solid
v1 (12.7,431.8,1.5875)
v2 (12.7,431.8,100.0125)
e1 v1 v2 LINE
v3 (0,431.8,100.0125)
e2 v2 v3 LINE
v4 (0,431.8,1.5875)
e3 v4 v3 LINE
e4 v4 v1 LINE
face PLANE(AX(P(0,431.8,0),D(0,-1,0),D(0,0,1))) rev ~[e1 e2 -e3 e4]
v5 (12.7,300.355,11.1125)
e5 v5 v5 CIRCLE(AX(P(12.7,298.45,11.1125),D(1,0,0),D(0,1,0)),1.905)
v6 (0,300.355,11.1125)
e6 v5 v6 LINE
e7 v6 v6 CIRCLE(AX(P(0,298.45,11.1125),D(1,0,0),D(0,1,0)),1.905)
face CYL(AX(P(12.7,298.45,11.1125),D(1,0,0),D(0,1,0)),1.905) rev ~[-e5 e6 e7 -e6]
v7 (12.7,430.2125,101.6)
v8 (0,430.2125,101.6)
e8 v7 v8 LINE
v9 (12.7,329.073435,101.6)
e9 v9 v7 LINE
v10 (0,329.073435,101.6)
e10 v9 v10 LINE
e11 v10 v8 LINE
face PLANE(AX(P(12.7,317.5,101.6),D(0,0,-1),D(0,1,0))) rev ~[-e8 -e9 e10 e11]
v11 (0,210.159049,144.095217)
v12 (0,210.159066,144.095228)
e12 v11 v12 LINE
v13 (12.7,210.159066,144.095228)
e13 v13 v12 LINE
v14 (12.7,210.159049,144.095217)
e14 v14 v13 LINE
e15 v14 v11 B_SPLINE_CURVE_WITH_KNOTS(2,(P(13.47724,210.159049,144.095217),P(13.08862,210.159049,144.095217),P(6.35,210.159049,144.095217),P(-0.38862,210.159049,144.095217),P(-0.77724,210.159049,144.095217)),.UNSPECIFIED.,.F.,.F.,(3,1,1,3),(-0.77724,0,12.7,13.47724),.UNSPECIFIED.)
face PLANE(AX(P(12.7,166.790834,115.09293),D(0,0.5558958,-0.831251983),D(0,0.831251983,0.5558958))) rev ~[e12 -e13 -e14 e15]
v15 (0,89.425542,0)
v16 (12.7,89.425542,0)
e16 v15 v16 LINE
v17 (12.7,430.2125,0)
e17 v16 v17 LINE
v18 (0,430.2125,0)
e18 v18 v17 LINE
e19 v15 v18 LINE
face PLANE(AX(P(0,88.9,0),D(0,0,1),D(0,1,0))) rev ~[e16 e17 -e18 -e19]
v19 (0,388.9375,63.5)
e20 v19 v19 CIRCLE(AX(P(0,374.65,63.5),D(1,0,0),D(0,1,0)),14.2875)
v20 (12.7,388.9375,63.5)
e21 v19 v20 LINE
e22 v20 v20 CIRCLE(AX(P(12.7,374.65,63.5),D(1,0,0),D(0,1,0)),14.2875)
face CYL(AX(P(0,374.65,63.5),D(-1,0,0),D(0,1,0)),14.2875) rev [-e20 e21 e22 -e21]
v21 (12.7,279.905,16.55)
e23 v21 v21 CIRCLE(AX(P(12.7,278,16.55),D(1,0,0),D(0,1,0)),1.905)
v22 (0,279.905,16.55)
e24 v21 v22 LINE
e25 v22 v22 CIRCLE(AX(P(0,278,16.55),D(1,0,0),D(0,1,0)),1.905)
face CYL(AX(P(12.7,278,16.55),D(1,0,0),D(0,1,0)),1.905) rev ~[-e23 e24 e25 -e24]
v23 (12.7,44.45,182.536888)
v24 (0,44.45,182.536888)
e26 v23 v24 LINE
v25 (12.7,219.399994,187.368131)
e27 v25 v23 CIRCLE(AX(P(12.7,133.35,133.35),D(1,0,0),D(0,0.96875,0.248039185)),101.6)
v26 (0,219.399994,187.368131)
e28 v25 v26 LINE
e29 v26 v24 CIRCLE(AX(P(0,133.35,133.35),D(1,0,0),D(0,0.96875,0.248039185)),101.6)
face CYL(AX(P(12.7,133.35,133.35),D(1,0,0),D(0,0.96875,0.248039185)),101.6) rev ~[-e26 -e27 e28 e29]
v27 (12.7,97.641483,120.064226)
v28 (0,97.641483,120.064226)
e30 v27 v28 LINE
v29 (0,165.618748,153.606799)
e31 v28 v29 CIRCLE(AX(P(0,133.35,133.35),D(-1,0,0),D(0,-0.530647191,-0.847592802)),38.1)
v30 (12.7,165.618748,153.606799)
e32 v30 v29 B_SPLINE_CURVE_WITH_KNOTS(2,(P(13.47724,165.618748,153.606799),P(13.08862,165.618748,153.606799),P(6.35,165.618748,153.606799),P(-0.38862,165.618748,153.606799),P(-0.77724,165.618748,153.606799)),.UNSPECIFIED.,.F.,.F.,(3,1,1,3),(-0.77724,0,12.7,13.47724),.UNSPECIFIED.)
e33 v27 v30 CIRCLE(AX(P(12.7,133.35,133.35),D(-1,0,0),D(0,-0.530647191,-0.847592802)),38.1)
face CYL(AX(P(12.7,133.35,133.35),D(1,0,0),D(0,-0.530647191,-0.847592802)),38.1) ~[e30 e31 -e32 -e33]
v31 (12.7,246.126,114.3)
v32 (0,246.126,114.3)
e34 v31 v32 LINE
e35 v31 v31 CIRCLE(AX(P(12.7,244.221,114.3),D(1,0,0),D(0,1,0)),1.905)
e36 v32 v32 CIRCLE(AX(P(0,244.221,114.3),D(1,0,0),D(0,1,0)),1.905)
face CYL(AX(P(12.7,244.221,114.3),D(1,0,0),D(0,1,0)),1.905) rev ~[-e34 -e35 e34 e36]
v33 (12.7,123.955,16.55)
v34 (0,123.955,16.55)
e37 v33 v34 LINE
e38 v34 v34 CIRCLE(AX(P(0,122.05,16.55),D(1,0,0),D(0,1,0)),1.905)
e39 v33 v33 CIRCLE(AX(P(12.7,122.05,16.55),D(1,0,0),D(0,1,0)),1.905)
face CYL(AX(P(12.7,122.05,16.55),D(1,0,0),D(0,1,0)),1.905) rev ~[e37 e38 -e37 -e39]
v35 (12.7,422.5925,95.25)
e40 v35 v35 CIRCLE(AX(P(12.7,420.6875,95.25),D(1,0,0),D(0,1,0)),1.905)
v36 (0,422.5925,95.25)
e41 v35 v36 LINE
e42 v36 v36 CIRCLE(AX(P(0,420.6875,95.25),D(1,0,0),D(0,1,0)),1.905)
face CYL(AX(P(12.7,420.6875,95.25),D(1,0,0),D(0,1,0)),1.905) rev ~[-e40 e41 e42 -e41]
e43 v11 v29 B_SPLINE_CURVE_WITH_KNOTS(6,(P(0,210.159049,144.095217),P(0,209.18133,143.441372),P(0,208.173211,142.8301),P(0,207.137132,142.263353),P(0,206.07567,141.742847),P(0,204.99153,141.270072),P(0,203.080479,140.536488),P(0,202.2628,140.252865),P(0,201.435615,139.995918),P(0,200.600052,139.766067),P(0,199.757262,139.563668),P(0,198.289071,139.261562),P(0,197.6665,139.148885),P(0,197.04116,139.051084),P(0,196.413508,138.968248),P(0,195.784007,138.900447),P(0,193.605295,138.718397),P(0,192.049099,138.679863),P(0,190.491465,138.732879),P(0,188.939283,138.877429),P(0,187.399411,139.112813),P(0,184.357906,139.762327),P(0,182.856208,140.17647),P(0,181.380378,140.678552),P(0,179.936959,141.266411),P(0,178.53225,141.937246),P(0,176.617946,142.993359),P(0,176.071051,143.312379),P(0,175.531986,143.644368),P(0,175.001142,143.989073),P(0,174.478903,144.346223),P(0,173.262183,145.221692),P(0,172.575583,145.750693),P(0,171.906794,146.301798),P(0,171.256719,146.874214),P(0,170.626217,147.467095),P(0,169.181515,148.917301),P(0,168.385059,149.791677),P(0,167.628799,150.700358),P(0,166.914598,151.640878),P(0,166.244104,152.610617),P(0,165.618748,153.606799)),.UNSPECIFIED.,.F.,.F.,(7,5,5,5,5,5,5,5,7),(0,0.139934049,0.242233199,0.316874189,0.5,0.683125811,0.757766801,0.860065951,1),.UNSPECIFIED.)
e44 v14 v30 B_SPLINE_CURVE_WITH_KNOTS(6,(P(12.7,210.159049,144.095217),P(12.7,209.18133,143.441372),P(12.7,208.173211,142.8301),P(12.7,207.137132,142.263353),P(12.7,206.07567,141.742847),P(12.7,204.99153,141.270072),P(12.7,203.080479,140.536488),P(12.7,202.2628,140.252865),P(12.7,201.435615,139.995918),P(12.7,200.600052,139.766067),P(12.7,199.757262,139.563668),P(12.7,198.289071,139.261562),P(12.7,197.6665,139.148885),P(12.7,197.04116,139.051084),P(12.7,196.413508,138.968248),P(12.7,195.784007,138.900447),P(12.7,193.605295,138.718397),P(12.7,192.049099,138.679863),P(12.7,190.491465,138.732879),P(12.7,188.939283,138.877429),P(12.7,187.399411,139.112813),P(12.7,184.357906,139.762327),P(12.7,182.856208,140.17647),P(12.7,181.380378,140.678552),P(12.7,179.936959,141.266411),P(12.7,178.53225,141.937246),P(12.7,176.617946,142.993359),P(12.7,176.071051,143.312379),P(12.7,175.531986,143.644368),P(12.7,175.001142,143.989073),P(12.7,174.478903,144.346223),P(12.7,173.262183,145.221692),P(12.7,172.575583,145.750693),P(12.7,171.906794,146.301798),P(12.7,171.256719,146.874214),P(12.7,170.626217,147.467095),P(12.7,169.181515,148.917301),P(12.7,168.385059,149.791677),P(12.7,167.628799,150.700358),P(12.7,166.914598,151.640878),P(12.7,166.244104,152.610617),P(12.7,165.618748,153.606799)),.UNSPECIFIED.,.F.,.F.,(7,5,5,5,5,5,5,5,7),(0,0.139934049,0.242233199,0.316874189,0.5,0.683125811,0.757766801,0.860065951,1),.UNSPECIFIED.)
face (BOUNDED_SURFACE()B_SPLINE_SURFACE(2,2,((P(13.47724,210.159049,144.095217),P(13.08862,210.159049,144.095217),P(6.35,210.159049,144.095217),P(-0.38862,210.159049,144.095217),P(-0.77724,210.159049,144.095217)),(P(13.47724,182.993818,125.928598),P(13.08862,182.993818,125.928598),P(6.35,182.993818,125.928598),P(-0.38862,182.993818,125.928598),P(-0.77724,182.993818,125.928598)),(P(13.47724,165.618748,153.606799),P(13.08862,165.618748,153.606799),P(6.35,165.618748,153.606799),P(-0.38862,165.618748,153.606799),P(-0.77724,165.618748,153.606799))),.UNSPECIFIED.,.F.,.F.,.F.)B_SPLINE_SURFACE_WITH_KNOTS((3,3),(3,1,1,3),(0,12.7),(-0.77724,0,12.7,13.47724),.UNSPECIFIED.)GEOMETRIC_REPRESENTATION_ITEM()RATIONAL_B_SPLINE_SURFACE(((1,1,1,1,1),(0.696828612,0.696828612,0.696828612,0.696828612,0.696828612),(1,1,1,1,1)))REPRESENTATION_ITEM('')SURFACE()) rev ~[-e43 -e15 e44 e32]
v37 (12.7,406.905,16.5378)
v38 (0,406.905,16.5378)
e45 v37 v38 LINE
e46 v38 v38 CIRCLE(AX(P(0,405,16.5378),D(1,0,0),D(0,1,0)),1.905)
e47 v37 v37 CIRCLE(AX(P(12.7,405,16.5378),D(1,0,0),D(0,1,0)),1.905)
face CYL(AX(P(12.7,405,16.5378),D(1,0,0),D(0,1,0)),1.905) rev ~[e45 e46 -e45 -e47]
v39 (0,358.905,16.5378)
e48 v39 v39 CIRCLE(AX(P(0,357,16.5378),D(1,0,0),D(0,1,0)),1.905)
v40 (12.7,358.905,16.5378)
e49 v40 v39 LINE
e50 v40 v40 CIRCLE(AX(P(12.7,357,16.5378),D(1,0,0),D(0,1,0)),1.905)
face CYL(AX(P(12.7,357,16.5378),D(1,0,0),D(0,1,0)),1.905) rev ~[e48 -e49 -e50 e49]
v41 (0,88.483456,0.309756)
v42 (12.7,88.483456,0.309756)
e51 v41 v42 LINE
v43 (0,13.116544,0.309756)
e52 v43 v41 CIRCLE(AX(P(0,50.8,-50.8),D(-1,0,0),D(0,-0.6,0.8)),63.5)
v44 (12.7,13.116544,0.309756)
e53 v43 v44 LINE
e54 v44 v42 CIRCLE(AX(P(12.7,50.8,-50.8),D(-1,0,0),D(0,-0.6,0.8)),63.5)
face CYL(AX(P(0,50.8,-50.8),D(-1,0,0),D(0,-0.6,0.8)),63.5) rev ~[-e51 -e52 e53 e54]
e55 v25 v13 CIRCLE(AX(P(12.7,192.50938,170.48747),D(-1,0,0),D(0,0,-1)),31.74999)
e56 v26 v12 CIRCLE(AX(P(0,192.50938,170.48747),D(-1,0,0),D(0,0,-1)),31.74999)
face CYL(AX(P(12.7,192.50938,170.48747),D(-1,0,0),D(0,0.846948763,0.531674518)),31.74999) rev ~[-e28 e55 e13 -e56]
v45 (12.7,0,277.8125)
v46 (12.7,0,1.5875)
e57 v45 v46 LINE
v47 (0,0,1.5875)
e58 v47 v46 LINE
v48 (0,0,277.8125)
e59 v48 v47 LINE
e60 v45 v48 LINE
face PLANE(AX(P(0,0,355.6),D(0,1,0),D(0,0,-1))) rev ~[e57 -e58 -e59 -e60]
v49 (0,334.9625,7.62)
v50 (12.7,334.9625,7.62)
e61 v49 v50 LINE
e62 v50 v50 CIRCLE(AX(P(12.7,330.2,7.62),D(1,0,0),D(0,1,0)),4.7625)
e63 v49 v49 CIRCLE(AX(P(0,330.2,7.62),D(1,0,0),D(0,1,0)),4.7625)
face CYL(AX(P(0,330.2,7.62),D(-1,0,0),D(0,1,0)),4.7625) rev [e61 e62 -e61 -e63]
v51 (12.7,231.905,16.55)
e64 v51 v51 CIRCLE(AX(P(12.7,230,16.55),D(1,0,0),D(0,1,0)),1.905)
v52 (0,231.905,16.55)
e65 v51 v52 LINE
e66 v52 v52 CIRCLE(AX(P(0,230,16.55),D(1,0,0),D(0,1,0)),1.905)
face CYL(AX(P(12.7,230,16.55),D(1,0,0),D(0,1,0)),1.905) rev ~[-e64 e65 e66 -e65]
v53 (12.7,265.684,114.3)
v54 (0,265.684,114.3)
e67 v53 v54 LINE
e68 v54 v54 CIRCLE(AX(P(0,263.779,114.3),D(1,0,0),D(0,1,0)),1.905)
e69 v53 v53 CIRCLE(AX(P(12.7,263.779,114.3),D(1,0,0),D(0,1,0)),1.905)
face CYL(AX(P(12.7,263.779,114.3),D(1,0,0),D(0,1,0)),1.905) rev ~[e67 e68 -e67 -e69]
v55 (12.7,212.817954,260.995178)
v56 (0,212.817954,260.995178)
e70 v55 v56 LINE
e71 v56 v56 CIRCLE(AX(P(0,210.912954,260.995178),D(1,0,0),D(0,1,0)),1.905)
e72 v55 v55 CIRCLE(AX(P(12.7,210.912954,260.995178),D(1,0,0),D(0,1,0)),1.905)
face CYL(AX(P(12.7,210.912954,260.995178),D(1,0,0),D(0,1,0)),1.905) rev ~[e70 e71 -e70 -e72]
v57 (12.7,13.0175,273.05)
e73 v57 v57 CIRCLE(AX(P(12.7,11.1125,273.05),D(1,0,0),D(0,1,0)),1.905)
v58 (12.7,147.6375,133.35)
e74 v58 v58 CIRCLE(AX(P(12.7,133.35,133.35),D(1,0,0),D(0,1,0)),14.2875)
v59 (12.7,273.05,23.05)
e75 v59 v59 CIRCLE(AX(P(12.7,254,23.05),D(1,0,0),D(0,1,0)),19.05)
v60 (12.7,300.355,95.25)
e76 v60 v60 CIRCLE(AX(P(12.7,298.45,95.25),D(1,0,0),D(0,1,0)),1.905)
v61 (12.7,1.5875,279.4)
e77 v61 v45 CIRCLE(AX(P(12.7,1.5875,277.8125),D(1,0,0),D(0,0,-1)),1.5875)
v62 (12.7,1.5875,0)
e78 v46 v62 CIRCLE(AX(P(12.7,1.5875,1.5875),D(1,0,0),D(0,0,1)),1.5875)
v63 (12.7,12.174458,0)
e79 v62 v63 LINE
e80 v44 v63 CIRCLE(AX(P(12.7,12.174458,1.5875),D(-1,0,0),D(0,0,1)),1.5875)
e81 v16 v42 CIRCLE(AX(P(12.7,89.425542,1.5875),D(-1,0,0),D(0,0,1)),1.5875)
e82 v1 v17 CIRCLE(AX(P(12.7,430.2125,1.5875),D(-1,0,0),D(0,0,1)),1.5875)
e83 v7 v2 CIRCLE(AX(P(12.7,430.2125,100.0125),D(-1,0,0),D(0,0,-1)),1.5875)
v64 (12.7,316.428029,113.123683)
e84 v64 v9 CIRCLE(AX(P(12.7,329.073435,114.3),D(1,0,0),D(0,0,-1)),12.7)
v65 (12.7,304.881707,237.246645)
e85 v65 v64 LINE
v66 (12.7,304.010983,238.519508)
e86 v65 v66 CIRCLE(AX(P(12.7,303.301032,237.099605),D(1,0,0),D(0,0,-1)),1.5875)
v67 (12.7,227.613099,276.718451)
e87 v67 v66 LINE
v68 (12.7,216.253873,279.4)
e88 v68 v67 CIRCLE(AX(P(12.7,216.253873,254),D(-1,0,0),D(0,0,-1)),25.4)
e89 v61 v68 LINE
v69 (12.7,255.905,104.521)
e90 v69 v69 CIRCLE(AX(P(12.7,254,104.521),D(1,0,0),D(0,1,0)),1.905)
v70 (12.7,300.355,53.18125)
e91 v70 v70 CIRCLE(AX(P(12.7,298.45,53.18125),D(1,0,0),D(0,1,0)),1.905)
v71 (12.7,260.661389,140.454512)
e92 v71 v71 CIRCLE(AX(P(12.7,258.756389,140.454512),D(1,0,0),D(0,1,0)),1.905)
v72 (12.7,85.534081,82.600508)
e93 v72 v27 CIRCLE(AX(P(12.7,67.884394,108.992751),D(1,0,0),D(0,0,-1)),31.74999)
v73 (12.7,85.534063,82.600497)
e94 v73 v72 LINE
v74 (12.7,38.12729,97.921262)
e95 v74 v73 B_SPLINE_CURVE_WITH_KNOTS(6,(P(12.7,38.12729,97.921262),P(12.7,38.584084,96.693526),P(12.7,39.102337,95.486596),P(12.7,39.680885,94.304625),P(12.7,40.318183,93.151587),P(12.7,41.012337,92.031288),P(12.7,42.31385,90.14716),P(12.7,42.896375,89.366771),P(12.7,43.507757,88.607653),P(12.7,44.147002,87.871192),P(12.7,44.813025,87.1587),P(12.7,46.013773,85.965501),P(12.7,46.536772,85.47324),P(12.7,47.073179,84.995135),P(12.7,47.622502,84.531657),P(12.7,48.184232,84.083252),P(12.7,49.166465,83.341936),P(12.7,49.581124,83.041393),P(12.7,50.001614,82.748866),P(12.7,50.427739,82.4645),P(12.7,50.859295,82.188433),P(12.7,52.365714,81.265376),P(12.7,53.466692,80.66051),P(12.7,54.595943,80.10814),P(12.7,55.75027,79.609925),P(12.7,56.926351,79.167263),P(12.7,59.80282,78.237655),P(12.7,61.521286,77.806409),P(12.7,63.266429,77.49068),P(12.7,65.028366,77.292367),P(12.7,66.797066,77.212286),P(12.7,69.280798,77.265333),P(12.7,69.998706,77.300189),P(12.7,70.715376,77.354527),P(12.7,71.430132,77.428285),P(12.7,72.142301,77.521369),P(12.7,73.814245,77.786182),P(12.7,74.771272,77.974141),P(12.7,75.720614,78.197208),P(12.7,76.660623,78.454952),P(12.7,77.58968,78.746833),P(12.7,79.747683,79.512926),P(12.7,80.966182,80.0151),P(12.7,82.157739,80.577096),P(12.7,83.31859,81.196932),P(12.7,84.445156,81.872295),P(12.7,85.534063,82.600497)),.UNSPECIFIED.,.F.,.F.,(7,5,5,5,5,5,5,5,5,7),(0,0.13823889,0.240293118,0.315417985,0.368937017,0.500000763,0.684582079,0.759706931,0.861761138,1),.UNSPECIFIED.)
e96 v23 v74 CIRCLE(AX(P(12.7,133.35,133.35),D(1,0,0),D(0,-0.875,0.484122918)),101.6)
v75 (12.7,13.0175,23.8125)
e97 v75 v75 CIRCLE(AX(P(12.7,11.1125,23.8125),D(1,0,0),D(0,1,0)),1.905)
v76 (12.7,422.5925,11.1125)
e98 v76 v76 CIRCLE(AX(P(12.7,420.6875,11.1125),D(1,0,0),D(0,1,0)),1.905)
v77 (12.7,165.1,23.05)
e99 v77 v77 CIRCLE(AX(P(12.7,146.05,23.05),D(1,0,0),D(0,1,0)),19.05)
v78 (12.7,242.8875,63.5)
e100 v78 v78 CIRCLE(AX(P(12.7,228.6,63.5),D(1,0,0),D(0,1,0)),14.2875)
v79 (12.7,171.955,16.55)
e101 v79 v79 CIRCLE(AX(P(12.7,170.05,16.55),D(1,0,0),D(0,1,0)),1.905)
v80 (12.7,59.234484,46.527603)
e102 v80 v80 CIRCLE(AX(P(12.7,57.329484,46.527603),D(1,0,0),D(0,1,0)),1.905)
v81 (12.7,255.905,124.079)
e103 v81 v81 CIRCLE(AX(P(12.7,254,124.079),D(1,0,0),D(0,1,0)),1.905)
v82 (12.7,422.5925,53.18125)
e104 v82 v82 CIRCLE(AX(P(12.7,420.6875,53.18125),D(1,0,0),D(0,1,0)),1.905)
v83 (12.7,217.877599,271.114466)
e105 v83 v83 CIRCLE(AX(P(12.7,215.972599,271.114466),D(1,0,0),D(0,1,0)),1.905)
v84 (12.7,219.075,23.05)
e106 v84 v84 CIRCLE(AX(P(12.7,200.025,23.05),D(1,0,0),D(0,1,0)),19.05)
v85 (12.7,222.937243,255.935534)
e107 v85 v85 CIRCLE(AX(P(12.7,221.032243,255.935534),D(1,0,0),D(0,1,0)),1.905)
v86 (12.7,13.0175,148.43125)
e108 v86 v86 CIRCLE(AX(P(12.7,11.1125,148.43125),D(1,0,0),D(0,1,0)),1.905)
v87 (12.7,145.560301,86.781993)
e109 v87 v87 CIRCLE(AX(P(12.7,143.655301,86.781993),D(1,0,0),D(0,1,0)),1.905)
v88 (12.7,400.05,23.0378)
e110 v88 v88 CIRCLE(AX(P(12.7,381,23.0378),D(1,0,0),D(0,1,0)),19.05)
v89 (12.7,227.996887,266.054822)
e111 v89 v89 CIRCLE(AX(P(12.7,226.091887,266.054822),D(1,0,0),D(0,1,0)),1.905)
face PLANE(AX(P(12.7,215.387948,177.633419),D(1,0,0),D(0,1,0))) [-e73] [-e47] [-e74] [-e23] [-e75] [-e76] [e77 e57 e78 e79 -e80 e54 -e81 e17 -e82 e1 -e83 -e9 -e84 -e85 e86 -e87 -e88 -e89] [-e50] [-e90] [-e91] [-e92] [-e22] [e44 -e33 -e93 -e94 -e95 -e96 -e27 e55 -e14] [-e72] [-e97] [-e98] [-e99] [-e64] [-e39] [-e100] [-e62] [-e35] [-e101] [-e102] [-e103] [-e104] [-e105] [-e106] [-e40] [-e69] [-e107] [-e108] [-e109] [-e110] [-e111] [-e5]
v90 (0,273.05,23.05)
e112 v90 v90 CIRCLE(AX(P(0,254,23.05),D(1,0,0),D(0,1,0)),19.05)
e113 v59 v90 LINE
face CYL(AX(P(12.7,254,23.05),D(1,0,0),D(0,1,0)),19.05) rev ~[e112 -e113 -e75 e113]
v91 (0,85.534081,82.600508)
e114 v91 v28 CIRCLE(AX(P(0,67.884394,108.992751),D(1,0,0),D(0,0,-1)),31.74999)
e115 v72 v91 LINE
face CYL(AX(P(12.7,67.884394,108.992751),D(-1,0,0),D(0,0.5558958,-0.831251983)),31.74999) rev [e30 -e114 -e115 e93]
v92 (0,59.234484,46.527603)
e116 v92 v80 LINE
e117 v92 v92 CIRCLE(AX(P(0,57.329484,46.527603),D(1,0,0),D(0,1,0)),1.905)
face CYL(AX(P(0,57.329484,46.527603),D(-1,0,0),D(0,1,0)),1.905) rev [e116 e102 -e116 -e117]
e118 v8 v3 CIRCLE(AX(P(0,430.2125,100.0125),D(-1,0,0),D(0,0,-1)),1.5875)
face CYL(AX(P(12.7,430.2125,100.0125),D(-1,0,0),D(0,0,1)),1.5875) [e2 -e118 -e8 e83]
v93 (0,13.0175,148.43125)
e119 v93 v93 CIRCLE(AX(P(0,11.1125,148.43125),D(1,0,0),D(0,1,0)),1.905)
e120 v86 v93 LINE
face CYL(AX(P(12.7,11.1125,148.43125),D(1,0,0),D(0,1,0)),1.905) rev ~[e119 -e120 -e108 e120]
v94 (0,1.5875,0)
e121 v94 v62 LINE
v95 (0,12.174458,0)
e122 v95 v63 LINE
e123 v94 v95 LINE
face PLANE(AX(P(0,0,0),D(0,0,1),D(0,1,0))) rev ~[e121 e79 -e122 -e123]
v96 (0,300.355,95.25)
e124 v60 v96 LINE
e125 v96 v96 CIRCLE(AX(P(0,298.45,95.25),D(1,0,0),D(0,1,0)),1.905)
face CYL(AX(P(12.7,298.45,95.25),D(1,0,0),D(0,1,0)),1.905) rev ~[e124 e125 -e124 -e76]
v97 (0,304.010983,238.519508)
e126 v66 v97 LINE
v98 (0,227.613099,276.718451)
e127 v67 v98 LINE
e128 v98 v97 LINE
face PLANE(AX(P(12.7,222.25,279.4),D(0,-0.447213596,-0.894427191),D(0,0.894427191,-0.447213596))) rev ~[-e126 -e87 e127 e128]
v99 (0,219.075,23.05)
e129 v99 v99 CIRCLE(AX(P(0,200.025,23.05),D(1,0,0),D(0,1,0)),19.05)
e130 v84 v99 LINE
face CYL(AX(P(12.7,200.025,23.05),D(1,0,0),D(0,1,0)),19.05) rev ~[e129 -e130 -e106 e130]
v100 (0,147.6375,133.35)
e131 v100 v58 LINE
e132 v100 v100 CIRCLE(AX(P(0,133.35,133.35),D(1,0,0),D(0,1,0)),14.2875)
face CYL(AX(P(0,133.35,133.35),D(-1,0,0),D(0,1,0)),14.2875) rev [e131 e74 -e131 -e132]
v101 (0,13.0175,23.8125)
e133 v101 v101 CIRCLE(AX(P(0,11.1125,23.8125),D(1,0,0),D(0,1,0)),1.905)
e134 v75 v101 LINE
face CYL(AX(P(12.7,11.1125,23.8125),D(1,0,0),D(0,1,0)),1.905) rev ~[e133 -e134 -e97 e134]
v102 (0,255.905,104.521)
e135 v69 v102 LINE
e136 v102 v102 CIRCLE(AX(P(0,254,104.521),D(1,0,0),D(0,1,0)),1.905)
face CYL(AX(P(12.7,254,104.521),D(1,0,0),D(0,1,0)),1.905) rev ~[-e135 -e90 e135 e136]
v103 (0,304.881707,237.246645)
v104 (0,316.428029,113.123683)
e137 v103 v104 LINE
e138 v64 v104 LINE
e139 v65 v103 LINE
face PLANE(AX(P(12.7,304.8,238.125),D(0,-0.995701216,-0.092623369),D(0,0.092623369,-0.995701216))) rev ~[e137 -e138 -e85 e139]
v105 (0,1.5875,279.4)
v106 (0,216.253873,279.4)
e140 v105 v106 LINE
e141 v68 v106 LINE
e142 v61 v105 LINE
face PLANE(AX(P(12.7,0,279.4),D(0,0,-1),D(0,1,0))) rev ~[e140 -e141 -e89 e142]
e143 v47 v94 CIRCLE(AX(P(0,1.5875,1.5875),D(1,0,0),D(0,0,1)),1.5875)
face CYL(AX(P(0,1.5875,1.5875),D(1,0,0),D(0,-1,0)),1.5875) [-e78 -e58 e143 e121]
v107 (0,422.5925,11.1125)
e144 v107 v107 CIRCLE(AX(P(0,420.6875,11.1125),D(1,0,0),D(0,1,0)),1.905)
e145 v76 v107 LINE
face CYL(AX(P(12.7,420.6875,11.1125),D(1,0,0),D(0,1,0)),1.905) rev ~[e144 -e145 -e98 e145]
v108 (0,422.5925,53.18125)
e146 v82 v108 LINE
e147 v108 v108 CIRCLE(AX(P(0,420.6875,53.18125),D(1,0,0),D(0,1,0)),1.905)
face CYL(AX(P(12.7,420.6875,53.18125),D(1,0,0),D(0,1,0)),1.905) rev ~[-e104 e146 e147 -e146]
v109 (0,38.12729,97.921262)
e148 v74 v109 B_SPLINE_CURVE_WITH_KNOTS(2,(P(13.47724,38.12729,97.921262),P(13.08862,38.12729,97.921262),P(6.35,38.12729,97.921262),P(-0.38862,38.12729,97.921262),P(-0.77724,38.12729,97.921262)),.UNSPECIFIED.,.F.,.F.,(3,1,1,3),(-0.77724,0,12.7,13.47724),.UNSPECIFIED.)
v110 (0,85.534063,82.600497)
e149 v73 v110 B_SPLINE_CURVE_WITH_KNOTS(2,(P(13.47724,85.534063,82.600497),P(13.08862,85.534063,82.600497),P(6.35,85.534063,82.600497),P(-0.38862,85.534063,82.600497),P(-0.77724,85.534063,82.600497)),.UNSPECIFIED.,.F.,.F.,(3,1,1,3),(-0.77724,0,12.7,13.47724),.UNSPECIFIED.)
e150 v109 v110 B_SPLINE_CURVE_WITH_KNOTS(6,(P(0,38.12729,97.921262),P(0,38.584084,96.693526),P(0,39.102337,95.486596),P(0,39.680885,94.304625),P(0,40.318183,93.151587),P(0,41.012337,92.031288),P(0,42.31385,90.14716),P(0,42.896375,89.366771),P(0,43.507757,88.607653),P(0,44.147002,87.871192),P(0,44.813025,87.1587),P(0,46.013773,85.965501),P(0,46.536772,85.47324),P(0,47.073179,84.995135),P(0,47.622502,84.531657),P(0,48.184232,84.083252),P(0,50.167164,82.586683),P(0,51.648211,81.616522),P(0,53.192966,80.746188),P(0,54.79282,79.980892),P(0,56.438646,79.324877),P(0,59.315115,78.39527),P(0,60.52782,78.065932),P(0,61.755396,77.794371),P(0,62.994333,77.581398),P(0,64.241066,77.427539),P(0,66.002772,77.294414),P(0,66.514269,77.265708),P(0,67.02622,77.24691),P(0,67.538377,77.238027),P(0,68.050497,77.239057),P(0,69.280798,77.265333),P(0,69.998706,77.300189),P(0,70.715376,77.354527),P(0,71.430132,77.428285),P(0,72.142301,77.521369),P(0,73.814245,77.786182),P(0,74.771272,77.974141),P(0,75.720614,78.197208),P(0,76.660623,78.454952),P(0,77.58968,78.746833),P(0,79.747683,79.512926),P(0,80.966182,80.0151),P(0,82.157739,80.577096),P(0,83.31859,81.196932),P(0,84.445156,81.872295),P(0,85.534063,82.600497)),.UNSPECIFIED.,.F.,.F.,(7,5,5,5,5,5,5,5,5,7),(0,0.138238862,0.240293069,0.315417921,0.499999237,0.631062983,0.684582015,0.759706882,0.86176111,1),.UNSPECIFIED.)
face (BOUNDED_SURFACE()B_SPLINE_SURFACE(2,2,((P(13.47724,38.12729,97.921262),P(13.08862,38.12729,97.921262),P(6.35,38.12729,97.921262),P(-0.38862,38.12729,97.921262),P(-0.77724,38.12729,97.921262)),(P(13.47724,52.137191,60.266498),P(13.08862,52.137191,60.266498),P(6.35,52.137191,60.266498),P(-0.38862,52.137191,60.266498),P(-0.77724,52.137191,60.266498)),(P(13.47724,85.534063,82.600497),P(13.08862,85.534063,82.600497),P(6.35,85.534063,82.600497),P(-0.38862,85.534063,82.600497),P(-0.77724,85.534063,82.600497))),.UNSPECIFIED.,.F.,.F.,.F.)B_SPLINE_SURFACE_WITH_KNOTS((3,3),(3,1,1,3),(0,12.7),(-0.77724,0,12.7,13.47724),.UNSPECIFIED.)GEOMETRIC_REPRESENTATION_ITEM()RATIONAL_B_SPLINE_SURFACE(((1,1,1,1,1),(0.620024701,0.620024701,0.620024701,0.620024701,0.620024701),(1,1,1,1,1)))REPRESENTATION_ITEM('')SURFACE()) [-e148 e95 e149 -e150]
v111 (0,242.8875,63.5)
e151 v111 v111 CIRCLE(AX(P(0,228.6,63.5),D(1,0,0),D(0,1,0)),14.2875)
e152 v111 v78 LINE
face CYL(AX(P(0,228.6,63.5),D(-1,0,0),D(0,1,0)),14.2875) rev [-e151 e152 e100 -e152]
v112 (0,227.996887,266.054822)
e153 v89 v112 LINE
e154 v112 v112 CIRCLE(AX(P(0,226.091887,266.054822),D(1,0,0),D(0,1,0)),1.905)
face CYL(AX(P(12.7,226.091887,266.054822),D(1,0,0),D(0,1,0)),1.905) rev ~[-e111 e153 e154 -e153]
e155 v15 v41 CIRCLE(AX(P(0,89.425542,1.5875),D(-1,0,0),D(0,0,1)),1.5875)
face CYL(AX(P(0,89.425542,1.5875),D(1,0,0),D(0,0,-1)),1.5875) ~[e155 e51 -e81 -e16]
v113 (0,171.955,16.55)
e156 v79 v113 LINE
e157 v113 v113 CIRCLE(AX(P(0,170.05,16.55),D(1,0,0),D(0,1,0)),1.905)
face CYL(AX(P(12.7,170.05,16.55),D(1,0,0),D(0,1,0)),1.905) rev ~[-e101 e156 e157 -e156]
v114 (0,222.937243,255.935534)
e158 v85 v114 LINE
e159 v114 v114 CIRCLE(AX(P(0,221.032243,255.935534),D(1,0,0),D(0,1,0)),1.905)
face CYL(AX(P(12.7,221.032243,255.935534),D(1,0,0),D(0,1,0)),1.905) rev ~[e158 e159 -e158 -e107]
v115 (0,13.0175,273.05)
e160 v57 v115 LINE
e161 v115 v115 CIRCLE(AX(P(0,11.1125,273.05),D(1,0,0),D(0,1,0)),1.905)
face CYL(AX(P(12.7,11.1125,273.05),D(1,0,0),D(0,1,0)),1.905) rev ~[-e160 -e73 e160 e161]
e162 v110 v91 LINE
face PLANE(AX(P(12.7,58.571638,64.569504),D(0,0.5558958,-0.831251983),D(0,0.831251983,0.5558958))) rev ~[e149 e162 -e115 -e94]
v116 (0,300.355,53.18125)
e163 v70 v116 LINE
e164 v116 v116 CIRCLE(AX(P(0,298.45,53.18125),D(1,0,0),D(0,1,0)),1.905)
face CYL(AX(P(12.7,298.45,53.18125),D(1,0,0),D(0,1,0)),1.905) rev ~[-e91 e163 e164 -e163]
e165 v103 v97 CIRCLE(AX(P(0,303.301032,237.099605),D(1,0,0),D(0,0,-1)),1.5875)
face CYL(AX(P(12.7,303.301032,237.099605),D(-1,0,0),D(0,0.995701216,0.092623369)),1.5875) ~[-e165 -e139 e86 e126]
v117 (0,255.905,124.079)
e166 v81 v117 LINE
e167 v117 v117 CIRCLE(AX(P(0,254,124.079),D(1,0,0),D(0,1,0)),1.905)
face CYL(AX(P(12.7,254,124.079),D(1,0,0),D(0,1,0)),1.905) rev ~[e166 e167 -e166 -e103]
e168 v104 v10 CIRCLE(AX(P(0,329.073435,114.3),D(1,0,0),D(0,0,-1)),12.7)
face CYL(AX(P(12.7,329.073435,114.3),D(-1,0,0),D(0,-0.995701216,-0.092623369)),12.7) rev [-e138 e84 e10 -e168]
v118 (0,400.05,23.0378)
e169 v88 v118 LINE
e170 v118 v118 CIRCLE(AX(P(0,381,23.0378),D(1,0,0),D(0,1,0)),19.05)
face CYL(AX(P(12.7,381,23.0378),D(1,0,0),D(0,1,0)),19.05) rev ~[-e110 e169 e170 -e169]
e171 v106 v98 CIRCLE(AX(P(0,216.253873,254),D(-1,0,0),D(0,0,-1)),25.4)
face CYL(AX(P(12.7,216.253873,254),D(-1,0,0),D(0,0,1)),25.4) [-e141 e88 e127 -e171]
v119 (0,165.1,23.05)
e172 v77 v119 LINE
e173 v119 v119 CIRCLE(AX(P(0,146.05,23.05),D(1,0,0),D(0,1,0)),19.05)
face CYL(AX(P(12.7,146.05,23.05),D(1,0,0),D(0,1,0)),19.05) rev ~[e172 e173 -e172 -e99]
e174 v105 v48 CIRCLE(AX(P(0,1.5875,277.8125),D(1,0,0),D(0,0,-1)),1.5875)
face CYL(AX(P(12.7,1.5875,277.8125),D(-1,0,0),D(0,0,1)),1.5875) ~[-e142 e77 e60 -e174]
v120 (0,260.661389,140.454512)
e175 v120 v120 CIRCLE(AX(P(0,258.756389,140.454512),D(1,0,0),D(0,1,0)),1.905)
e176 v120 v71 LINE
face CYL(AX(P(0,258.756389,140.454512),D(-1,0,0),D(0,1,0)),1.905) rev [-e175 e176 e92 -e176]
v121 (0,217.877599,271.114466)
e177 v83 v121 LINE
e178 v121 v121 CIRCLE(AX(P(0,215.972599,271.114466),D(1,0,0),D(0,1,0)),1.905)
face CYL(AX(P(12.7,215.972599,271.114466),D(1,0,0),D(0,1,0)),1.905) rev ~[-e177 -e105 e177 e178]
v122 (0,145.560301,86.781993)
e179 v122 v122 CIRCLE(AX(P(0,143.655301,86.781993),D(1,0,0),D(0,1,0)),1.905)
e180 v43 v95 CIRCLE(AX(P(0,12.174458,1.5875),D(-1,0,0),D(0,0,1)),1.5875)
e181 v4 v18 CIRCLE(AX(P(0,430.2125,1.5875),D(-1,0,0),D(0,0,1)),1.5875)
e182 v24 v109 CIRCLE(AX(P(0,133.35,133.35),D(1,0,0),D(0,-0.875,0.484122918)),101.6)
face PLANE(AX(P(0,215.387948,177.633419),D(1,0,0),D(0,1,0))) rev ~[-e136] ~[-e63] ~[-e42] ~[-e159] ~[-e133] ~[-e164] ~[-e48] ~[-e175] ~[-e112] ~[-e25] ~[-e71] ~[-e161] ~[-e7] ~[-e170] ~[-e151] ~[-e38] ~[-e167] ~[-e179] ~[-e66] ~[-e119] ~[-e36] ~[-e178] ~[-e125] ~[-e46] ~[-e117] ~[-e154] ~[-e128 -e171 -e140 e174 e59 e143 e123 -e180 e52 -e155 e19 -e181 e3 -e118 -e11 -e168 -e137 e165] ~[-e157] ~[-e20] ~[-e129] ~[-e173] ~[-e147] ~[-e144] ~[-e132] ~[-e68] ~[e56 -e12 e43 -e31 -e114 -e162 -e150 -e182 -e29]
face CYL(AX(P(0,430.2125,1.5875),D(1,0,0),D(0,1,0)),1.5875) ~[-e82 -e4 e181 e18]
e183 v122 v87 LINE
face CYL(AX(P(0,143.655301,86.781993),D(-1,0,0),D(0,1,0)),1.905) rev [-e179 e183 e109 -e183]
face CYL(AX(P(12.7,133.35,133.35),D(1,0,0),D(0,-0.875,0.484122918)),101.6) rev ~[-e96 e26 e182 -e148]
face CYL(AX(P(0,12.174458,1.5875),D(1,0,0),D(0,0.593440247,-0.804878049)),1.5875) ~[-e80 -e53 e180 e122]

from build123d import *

# Parameters (mm, degrees)
F0_R     = 1.905
F0_R_2   = 14.2875
F0_R_3   = 4.7625
F1_DEPTH = 12.7
F2_R     = 19.05
F3_DEPTH = 12.7
F5_DEPTH = 12.7
F6_R     = 1.905
F7_DEPTH = 12.7
F8_R     = 31.74999
F9_R     = 25.4
F10_R    = 12.7
F11_R    = 1.5875


# Not quite as in the source:
# - a fillet or chamfer is up to 0.001 mm smaller than in the source, because OpenCascade refuses the exact size


with BuildPart() as f1:
    # F0 (on Right) → F1 (new body)
    with BuildSketch(Plane.YZ):
        with BuildLine():
            Line((0, 355.6), (0, 0))
            Line((0, 0), (12.7, 0))
            ThreePointArc((12.7, 0), (50.8, 12.7), (88.9, 0))
            Line((88.9, 0), (431.8, 0))
            Line((431.8, 0), (431.8, 355.6))
            Line((431.8, 355.6), (0, 355.6))
        make_face()
        with Locations((57.329483813, 46.5276031344)):
            Circle(F0_R, mode=Mode.SUBTRACT)
        with Locations((143.6553005282, 86.7819925652)):
            Circle(F0_R, mode=Mode.SUBTRACT)
        with Locations((228.6, 63.5)):
            Circle(F0_R_2, mode=Mode.SUBTRACT)
        with Locations((330.2, 7.62)):
            Circle(F0_R_3, mode=Mode.SUBTRACT)
        with Locations((374.65, 63.5)):
            Circle(F0_R_2, mode=Mode.SUBTRACT)
        with Locations((133.35, 133.35)):
            Circle(F0_R_2, mode=Mode.SUBTRACT)
        with Locations((258.7563894819, 140.4545118063)):
            Circle(F0_R, mode=Mode.SUBTRACT)
    extrude(amount=F1_DEPTH)

    # F2 (on face) → F3 (cut, through all)
    with BuildSketch(Plane.YZ.offset(12.7)):
        with Locations((146.05, 23.05)):
            Circle(F2_R)
        with Locations((254, 23.05)):
            Circle(F2_R)
        with Locations((381, 23.0378)):
            Circle(F2_R)
        with Locations((200.025, 23.05)):
            Circle(F2_R)
    extrude(amount=-F3_DEPTH, mode=Mode.SUBTRACT)

    # F4 (on face) → F5 (cut, through all)
    with BuildSketch(Plane.YZ.offset(12.7)):
        Polygon((431.8, 355.6), (0, 355.6), (0, 279.4), (44.45, 279.4), (222.25, 279.4), (304.8, 238.125), (317.5, 101.6), (431.8, 101.6), (431.8, 247.65), align=None)
        with BuildLine():
            ThreePointArc((231.775, 158.5507812379), (146.2540591137, 234.1272060458), (44.45, 182.5368884968))
            ThreePointArc((44.45, 182.5368884968), (31.75, 133.35), (44.45, 84.1631115032))
            ThreePointArc((44.45, 84.1631115032), (50.9265271613, 73.9451927433), (58.5716384481, 64.5695039011))
            Line((58.5716384481, 64.5695039011), (113.1323420197, 101.0567142305))
            ThreePointArc((113.1323420197, 101.0567142305), (112.1703700265, 165.0207005635), (170.9171066227, 139.7))
            ThreePointArc((170.9171066227, 139.7), (171.3165429182, 136.5361605167), (171.45, 133.35))
            ThreePointArc((171.45, 133.35), (170.2668375807, 123.9289011764), (166.7908344859, 115.0929304409))
            Line((166.7908344859, 115.0929304409), (231.775, 158.5507812379))
        make_face()
    extrude(amount=-F5_DEPTH, mode=Mode.SUBTRACT)

    # F6 (on face) → F7 (cut, through all)
    with BuildSketch(Plane.YZ.offset(12.7)):
        with Locations((420.6875, 11.1125)):
            Circle(F6_R)
        with Locations((420.6875, 53.18125)):
            Circle(F6_R)
        with Locations((420.6875, 95.25)):
            Circle(F6_R)
        with Locations((298.45, 11.1125)):
            Circle(F6_R)
        with Locations((298.45, 95.25)):
            Circle(F6_R)
        with Locations((298.45, 53.18125)):
            Circle(F6_R)
        with Locations((11.1125, 23.8125)):
            Circle(F6_R)
        with Locations((122.05, 16.55)):
            Circle(F6_R)
        with Locations((170.05, 16.55)):
            Circle(F6_R)
        with Locations((230, 16.55)):
            Circle(F6_R)
        with Locations((278, 16.55)):
            Circle(F6_R)
        with Locations((357, 16.5378)):
            Circle(F6_R)
        with Locations((405, 16.5378)):
            Circle(F6_R)
        with Locations((11.1125, 273.05)):
            Circle(F6_R)
        with Locations((11.1125, 148.43125)):
            Circle(F6_R)
        with Locations((215.9725987291, 271.1144663844)):
            Circle(F6_R)
        with Locations((210.9129544728, 260.9951778719)):
            Circle(F6_R)
        with Locations((221.0322429853, 255.9355336156)):
            Circle(F6_R)
        with Locations((226.0918872416, 266.0548221281)):
            Circle(F6_R)
        with Locations((254, 124.079)):
            Circle(F6_R)
        with Locations((244.221, 114.3)):
            Circle(F6_R)
        with Locations((254, 104.521)):
            Circle(F6_R)
        with Locations((263.779, 114.3)):
            Circle(F6_R)
    extrude(amount=-F7_DEPTH, mode=Mode.SUBTRACT)

    # F8 (radius 31.75 in the source; OpenCascade refuses exactly that, so slightly less here)
    f8_edges = [f1.edges().sort_by_distance(p)[0] for p in [
        (6.35, 58.571638, 64.569504),
        (6.35, 113.132342, 101.056714),
        (6.35, 166.790834, 115.09293),
        (6.35, 231.775, 158.550781),
    ]]
    fillet(f8_edges, radius=F8_R)

    # F9
    f9_edges = [f1.edges().sort_by_distance(p)[0] for p in [
        (6.35, 222.25, 279.4),
    ]]
    fillet(f9_edges, radius=F9_R)

    # F10
    f10_edges = [f1.edges().sort_by_distance(p)[0] for p in [
        (6.35, 317.5, 101.6),
    ]]
    fillet(f10_edges, radius=F10_R)

    # F11
    f11_edges = [f1.edges().sort_by_distance(p)[0] for p in [
        (6.35, 431.8, 101.6),
        (6.35, 431.8, 0),
        (6.35, 0, 0),
        (6.35, 12.7, 0),
        (6.35, 88.9, 0),
        (6.35, 0, 279.4),
        (6.35, 304.8, 238.125),
    ]]
    fillet(f11_edges, radius=F11_R)


solid = f1.part
